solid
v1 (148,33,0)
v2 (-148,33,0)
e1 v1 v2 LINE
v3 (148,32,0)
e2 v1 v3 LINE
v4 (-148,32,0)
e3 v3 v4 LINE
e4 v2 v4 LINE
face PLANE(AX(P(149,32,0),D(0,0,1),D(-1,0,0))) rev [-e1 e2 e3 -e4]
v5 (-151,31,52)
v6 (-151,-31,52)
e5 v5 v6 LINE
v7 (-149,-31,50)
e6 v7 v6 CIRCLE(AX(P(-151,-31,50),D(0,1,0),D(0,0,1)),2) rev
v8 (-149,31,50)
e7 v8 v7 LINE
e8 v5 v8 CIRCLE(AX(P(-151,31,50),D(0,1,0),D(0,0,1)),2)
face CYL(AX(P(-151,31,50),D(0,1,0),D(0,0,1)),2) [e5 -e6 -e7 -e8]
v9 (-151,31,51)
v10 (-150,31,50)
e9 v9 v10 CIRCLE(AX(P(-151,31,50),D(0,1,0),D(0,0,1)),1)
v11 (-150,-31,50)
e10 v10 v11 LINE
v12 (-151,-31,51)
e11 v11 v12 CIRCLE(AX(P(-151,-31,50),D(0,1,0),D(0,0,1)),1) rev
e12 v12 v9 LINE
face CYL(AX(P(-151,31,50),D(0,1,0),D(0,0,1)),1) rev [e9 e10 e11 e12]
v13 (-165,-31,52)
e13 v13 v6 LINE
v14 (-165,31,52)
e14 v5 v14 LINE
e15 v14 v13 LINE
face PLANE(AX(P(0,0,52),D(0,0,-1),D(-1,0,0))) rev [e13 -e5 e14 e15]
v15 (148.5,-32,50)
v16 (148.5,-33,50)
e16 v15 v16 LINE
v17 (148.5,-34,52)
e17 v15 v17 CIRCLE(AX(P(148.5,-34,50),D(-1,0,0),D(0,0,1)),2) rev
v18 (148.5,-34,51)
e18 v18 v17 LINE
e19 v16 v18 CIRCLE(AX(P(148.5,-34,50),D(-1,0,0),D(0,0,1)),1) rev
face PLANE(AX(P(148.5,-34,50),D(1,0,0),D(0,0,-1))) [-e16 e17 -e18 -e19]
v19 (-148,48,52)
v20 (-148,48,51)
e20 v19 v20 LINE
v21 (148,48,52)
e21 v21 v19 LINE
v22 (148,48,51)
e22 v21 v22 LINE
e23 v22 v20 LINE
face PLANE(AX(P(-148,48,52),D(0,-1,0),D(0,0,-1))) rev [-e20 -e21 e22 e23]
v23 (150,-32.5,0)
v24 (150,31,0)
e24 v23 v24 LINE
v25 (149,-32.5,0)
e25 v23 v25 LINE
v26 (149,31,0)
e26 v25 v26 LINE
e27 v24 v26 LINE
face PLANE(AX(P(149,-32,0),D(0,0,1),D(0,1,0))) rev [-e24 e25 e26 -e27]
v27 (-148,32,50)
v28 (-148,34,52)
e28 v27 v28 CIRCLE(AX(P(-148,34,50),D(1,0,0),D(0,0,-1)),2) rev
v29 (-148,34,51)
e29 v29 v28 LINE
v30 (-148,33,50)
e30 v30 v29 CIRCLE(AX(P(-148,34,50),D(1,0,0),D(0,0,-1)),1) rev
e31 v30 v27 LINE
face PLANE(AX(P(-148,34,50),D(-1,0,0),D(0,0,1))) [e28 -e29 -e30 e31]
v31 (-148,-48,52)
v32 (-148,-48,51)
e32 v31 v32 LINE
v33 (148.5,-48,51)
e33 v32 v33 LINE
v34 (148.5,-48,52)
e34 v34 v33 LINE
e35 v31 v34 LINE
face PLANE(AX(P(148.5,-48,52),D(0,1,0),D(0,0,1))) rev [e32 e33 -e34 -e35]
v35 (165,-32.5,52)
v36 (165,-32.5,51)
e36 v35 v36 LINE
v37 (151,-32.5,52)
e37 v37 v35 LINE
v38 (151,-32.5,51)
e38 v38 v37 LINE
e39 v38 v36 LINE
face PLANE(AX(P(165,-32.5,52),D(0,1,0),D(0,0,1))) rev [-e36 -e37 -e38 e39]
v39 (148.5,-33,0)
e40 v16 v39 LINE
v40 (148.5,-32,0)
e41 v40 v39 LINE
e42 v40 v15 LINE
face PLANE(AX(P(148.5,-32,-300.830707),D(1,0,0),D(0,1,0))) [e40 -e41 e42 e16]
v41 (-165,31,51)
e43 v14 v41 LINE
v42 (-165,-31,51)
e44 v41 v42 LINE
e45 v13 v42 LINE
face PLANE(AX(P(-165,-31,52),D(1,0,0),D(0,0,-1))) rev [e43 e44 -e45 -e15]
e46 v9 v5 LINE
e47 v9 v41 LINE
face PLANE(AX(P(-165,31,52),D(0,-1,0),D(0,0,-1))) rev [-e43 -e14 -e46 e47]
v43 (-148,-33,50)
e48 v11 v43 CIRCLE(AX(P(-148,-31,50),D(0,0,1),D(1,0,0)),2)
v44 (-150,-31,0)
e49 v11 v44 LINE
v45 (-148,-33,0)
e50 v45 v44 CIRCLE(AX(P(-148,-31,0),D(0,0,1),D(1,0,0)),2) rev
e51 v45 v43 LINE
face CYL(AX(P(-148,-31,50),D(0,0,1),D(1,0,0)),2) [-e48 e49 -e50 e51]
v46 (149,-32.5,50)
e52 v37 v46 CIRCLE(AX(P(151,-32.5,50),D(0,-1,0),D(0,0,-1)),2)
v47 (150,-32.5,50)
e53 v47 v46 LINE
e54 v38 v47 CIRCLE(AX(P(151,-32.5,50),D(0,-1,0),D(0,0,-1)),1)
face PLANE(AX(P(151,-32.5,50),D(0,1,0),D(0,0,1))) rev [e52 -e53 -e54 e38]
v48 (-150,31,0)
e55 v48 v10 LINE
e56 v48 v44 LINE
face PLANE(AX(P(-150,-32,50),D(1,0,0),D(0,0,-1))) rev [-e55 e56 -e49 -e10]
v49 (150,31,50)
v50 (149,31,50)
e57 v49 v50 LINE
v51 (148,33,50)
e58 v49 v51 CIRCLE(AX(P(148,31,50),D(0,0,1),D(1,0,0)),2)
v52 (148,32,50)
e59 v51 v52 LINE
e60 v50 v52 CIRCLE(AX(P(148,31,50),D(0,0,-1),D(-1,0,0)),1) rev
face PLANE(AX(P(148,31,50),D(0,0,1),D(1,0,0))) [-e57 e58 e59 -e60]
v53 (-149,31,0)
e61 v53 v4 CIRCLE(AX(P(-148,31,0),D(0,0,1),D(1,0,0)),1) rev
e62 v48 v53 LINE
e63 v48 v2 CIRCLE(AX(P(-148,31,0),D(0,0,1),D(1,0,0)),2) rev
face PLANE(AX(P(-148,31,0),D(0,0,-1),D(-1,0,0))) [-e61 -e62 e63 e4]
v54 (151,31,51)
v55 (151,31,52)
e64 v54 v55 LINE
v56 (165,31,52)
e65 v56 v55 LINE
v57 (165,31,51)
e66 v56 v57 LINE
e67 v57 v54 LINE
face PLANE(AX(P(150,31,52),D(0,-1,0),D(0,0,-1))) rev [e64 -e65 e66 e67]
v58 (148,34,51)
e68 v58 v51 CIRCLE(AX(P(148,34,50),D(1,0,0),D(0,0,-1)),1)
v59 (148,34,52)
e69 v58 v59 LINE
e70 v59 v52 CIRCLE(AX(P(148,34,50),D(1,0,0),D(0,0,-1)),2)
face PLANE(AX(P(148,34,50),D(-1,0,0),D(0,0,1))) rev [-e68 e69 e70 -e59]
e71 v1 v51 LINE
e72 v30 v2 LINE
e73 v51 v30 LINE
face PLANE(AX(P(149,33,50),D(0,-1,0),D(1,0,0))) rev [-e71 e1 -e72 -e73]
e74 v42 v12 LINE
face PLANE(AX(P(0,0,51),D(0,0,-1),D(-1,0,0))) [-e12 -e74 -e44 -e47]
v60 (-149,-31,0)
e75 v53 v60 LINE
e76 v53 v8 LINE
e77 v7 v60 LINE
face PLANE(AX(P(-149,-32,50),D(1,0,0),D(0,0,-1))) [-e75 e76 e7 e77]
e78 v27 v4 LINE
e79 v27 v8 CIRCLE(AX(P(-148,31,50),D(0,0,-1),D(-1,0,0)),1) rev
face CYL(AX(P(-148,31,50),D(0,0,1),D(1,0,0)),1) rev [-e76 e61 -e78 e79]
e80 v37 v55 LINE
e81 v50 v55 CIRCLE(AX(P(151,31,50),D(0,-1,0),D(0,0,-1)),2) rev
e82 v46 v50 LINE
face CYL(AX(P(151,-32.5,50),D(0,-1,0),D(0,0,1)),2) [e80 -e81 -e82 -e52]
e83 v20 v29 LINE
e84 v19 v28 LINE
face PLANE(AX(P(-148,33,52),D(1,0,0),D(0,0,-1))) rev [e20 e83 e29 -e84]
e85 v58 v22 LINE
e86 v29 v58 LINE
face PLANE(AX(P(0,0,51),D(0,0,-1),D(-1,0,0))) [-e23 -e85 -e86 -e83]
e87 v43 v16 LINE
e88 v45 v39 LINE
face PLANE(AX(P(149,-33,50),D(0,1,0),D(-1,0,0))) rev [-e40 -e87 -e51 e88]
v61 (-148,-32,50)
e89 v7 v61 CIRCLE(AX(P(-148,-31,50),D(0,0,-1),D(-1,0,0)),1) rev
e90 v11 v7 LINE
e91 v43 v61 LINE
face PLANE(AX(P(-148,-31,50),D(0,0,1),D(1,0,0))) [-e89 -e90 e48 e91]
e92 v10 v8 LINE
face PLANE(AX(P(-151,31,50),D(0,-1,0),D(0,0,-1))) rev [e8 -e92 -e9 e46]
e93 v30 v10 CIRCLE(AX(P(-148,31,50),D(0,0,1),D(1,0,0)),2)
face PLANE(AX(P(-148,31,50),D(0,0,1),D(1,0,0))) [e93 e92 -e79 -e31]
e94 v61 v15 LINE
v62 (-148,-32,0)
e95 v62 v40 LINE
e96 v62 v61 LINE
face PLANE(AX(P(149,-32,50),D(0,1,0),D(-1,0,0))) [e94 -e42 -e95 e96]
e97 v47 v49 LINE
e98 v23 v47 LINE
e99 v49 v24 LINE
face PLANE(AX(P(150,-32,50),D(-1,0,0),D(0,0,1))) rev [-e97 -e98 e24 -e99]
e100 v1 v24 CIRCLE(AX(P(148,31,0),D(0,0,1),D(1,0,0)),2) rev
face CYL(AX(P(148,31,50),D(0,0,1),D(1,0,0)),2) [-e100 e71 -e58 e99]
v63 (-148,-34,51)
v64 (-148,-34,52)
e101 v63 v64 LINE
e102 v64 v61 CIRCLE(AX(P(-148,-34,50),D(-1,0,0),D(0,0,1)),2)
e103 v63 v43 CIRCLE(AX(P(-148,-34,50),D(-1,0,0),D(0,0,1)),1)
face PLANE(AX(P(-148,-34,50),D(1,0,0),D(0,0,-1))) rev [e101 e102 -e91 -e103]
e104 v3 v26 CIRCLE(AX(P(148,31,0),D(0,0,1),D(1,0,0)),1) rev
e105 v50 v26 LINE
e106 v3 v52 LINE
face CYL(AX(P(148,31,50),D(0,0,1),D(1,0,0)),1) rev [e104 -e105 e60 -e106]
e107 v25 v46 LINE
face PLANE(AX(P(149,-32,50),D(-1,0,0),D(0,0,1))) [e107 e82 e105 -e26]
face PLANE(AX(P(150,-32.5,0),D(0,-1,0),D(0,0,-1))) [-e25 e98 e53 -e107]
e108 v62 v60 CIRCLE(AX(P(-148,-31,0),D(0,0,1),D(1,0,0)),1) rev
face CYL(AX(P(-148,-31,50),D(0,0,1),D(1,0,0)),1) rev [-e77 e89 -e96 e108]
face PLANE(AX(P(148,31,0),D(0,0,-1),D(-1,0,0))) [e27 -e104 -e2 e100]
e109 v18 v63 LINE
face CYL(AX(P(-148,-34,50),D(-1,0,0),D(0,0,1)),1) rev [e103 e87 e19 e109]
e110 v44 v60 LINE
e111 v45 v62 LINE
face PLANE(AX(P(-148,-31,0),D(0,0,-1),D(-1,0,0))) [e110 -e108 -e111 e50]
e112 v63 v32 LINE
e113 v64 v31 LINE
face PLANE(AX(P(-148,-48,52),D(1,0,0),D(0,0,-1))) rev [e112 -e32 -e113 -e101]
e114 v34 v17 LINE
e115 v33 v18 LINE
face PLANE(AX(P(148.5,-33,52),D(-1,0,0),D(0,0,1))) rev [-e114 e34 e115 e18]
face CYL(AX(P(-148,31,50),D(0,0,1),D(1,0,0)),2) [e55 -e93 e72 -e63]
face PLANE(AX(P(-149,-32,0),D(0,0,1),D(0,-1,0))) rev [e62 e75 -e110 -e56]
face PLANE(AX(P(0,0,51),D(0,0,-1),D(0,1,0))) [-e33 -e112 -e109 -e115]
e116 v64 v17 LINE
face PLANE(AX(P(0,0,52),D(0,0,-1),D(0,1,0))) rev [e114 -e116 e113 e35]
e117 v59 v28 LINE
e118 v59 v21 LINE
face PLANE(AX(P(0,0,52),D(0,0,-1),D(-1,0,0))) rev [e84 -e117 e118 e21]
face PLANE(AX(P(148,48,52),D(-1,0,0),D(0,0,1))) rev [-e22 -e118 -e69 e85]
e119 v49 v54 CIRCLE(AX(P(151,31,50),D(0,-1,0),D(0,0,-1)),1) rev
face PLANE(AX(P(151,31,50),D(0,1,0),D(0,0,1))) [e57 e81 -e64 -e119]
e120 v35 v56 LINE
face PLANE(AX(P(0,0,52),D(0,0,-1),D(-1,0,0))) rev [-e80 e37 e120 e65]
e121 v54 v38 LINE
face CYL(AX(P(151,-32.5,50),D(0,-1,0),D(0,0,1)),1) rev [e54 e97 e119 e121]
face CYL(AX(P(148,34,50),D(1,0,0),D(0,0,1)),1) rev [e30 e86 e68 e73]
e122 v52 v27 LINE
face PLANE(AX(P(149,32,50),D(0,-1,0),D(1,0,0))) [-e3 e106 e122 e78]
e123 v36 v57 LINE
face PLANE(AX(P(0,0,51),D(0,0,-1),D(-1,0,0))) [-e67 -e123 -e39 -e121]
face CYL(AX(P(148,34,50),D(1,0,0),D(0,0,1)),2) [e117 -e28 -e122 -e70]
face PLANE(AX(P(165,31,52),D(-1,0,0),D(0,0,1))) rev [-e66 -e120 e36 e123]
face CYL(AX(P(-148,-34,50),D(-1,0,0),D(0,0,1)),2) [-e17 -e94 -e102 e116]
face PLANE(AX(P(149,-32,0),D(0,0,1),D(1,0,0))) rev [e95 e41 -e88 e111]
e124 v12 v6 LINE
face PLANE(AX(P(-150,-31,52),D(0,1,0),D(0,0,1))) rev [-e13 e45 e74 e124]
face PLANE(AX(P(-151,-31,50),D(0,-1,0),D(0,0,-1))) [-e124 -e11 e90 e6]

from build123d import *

# Parameters (mm, degrees)
SKETCH1_W                 = 300
SKETCH1_H                 = 66
SKETCH1_W_2               = 298
SKETCH1_H_2               = 64
BOSS_EXTRUDE1_DEPTH       = 50
CONVERT_SOLID1_DEPTH      = 50
CONVERT_SOLID1_2_DEPTH    = 50
EDGE_FLANGE1_DEPTH        = 296
EDGE_FLANGE1_BEND_DEPTH   = 63.5
EDGE_FLANGE1_BEND_2_DEPTH = 296.5
EDGE_FLANGE1_BEND_3_DEPTH = 62


# Read off the part's stored shape, not the designer's step: Convert-Solid1
# Sheet-metal steps are written as plain solids
with BuildPart() as part:
    # Sketch1 → Boss-Extrude1 (new body)
    with BuildSketch(Plane.XY):
        Rectangle(SKETCH1_W, SKETCH1_H)
        Rectangle(SKETCH1_W_2, SKETCH1_H_2, mode=Mode.SUBTRACT)
    extrude(amount=BOSS_EXTRUDE1_DEPTH)

    # Convert-Solid1 outline → Convert-Solid1 (cut)
    with BuildSketch(Plane.XY):
        Polygon((149, -32.5), (149, -32), (148.5, -32), (148.5, -33), (150, -33), (150, -32.5), align=None)
        with BuildLine():
            ThreePointArc((148, 33), (149.414213562, 32.414213562), (150, 31))
            Line((150, 31), (150, 33))
            Line((150, 33), (148, 33))
        make_face()
        with BuildLine():
            Line((-150, -33), (-148, -33))
            ThreePointArc((-148, -33), (-149.414213562, -32.414213562), (-150, -31))
            Line((-150, -31), (-150, -33))
        make_face()
        with BuildLine():
            ThreePointArc((-150, 31), (-149.414213562, 32.414213562), (-148, 33))
            Line((-148, 33), (-150, 33))
            Line((-150, 33), (-150, 31))
        make_face()
    extrude(amount=CONVERT_SOLID1_DEPTH, mode=Mode.SUBTRACT)

    # Convert-Solid1 2 outline → Convert-Solid1 2 (add)
    with BuildSketch(Plane.XY):
        with BuildLine():
            ThreePointArc((148, 32), (148.707106781, 31.707106781), (149, 31))
            Line((149, 31), (149, 32))
            Line((149, 32), (148, 32))
        make_face()
        with BuildLine():
            ThreePointArc((-149, 31), (-148.707106781, 31.707106781), (-148, 32))
            Line((-148, 32), (-149, 32))
            Line((-149, 32), (-149, 31))
        make_face()
        with BuildLine():
            Line((-149, -32), (-148, -32))
            ThreePointArc((-148, -32), (-148.707106781, -31.707106781), (-149, -31))
            Line((-149, -31), (-149, -32))
        make_face()
    extrude(amount=CONVERT_SOLID1_2_DEPTH)

    # Edge-Flange1 section (across the edge) → Edge-Flange1 (add)
    with BuildSketch(Plane(origin=(-148, 33, 51), x_dir=(0, 0, -1), z_dir=(1, 0, 0))):
        with BuildLine():
            Line((-1, 1), (-1, 15))
            Line((-1, 15), (0, 15))
            Line((0, 15), (0, 1))
            ThreePointArc((0, 1), (0.292893219, 0.292893219), (1, 0))
            Line((1, 0), (1, -1))
            ThreePointArc((1, -1), (-0.414213562, -0.414213562), (-1, 1))
        make_face()
    extrude(amount=EDGE_FLANGE1_DEPTH)

    # Edge-Flange1 section 2 (across the edge) → Edge-Flange1 bend (add)
    with BuildSketch(Plane(origin=(150, 31, 51), x_dir=(0, 0, -1), z_dir=(0, -1, 0))):
        with BuildLine():
            Line((-1, 1), (-1, 15))
            Line((-1, 15), (0, 15))
            Line((0, 15), (0, 1))
            ThreePointArc((0, 1), (0.292893219, 0.292893219), (1, 0))
            Line((1, 0), (1, -1))
            ThreePointArc((1, -1), (-0.414213562, -0.414213562), (-1, 1))
        make_face()
    extrude(amount=EDGE_FLANGE1_BEND_DEPTH)

    # Edge-Flange1 section 3 (across the edge) → Edge-Flange1 bend 2 (add)
    with BuildSketch(Plane(origin=(148.5, -33, 51), x_dir=(0, 0, -1), z_dir=(-1, 0, 0))):
        with BuildLine():
            Line((-1, 1), (-1, 15))
            Line((-1, 15), (0, 15))
            Line((0, 15), (0, 1))
            ThreePointArc((0, 1), (0.292893219, 0.292893219), (1, 0))
            Line((1, 0), (1, -1))
            ThreePointArc((1, -1), (-0.414213562, -0.414213562), (-1, 1))
        make_face()
    extrude(amount=EDGE_FLANGE1_BEND_2_DEPTH)

    # Edge-Flange1 section 4 (across the edge) → Edge-Flange1 bend 3 (add)
    with BuildSketch(Plane(origin=(-150, -31, 51), x_dir=(0, 0, -1), z_dir=(0, 1, 0))):
        with BuildLine():
            Line((-1, 1), (-1, 15))
            Line((-1, 15), (0, 15))
            Line((0, 15), (0, 1))
            ThreePointArc((0, 1), (0.292893219, 0.292893219), (1, 0))
            Line((1, 0), (1, -1))
            ThreePointArc((1, -1), (-0.414213562, -0.414213562), (-1, 1))
        make_face()
    extrude(amount=EDGE_FLANGE1_BEND_3_DEPTH)


solid = part.part
